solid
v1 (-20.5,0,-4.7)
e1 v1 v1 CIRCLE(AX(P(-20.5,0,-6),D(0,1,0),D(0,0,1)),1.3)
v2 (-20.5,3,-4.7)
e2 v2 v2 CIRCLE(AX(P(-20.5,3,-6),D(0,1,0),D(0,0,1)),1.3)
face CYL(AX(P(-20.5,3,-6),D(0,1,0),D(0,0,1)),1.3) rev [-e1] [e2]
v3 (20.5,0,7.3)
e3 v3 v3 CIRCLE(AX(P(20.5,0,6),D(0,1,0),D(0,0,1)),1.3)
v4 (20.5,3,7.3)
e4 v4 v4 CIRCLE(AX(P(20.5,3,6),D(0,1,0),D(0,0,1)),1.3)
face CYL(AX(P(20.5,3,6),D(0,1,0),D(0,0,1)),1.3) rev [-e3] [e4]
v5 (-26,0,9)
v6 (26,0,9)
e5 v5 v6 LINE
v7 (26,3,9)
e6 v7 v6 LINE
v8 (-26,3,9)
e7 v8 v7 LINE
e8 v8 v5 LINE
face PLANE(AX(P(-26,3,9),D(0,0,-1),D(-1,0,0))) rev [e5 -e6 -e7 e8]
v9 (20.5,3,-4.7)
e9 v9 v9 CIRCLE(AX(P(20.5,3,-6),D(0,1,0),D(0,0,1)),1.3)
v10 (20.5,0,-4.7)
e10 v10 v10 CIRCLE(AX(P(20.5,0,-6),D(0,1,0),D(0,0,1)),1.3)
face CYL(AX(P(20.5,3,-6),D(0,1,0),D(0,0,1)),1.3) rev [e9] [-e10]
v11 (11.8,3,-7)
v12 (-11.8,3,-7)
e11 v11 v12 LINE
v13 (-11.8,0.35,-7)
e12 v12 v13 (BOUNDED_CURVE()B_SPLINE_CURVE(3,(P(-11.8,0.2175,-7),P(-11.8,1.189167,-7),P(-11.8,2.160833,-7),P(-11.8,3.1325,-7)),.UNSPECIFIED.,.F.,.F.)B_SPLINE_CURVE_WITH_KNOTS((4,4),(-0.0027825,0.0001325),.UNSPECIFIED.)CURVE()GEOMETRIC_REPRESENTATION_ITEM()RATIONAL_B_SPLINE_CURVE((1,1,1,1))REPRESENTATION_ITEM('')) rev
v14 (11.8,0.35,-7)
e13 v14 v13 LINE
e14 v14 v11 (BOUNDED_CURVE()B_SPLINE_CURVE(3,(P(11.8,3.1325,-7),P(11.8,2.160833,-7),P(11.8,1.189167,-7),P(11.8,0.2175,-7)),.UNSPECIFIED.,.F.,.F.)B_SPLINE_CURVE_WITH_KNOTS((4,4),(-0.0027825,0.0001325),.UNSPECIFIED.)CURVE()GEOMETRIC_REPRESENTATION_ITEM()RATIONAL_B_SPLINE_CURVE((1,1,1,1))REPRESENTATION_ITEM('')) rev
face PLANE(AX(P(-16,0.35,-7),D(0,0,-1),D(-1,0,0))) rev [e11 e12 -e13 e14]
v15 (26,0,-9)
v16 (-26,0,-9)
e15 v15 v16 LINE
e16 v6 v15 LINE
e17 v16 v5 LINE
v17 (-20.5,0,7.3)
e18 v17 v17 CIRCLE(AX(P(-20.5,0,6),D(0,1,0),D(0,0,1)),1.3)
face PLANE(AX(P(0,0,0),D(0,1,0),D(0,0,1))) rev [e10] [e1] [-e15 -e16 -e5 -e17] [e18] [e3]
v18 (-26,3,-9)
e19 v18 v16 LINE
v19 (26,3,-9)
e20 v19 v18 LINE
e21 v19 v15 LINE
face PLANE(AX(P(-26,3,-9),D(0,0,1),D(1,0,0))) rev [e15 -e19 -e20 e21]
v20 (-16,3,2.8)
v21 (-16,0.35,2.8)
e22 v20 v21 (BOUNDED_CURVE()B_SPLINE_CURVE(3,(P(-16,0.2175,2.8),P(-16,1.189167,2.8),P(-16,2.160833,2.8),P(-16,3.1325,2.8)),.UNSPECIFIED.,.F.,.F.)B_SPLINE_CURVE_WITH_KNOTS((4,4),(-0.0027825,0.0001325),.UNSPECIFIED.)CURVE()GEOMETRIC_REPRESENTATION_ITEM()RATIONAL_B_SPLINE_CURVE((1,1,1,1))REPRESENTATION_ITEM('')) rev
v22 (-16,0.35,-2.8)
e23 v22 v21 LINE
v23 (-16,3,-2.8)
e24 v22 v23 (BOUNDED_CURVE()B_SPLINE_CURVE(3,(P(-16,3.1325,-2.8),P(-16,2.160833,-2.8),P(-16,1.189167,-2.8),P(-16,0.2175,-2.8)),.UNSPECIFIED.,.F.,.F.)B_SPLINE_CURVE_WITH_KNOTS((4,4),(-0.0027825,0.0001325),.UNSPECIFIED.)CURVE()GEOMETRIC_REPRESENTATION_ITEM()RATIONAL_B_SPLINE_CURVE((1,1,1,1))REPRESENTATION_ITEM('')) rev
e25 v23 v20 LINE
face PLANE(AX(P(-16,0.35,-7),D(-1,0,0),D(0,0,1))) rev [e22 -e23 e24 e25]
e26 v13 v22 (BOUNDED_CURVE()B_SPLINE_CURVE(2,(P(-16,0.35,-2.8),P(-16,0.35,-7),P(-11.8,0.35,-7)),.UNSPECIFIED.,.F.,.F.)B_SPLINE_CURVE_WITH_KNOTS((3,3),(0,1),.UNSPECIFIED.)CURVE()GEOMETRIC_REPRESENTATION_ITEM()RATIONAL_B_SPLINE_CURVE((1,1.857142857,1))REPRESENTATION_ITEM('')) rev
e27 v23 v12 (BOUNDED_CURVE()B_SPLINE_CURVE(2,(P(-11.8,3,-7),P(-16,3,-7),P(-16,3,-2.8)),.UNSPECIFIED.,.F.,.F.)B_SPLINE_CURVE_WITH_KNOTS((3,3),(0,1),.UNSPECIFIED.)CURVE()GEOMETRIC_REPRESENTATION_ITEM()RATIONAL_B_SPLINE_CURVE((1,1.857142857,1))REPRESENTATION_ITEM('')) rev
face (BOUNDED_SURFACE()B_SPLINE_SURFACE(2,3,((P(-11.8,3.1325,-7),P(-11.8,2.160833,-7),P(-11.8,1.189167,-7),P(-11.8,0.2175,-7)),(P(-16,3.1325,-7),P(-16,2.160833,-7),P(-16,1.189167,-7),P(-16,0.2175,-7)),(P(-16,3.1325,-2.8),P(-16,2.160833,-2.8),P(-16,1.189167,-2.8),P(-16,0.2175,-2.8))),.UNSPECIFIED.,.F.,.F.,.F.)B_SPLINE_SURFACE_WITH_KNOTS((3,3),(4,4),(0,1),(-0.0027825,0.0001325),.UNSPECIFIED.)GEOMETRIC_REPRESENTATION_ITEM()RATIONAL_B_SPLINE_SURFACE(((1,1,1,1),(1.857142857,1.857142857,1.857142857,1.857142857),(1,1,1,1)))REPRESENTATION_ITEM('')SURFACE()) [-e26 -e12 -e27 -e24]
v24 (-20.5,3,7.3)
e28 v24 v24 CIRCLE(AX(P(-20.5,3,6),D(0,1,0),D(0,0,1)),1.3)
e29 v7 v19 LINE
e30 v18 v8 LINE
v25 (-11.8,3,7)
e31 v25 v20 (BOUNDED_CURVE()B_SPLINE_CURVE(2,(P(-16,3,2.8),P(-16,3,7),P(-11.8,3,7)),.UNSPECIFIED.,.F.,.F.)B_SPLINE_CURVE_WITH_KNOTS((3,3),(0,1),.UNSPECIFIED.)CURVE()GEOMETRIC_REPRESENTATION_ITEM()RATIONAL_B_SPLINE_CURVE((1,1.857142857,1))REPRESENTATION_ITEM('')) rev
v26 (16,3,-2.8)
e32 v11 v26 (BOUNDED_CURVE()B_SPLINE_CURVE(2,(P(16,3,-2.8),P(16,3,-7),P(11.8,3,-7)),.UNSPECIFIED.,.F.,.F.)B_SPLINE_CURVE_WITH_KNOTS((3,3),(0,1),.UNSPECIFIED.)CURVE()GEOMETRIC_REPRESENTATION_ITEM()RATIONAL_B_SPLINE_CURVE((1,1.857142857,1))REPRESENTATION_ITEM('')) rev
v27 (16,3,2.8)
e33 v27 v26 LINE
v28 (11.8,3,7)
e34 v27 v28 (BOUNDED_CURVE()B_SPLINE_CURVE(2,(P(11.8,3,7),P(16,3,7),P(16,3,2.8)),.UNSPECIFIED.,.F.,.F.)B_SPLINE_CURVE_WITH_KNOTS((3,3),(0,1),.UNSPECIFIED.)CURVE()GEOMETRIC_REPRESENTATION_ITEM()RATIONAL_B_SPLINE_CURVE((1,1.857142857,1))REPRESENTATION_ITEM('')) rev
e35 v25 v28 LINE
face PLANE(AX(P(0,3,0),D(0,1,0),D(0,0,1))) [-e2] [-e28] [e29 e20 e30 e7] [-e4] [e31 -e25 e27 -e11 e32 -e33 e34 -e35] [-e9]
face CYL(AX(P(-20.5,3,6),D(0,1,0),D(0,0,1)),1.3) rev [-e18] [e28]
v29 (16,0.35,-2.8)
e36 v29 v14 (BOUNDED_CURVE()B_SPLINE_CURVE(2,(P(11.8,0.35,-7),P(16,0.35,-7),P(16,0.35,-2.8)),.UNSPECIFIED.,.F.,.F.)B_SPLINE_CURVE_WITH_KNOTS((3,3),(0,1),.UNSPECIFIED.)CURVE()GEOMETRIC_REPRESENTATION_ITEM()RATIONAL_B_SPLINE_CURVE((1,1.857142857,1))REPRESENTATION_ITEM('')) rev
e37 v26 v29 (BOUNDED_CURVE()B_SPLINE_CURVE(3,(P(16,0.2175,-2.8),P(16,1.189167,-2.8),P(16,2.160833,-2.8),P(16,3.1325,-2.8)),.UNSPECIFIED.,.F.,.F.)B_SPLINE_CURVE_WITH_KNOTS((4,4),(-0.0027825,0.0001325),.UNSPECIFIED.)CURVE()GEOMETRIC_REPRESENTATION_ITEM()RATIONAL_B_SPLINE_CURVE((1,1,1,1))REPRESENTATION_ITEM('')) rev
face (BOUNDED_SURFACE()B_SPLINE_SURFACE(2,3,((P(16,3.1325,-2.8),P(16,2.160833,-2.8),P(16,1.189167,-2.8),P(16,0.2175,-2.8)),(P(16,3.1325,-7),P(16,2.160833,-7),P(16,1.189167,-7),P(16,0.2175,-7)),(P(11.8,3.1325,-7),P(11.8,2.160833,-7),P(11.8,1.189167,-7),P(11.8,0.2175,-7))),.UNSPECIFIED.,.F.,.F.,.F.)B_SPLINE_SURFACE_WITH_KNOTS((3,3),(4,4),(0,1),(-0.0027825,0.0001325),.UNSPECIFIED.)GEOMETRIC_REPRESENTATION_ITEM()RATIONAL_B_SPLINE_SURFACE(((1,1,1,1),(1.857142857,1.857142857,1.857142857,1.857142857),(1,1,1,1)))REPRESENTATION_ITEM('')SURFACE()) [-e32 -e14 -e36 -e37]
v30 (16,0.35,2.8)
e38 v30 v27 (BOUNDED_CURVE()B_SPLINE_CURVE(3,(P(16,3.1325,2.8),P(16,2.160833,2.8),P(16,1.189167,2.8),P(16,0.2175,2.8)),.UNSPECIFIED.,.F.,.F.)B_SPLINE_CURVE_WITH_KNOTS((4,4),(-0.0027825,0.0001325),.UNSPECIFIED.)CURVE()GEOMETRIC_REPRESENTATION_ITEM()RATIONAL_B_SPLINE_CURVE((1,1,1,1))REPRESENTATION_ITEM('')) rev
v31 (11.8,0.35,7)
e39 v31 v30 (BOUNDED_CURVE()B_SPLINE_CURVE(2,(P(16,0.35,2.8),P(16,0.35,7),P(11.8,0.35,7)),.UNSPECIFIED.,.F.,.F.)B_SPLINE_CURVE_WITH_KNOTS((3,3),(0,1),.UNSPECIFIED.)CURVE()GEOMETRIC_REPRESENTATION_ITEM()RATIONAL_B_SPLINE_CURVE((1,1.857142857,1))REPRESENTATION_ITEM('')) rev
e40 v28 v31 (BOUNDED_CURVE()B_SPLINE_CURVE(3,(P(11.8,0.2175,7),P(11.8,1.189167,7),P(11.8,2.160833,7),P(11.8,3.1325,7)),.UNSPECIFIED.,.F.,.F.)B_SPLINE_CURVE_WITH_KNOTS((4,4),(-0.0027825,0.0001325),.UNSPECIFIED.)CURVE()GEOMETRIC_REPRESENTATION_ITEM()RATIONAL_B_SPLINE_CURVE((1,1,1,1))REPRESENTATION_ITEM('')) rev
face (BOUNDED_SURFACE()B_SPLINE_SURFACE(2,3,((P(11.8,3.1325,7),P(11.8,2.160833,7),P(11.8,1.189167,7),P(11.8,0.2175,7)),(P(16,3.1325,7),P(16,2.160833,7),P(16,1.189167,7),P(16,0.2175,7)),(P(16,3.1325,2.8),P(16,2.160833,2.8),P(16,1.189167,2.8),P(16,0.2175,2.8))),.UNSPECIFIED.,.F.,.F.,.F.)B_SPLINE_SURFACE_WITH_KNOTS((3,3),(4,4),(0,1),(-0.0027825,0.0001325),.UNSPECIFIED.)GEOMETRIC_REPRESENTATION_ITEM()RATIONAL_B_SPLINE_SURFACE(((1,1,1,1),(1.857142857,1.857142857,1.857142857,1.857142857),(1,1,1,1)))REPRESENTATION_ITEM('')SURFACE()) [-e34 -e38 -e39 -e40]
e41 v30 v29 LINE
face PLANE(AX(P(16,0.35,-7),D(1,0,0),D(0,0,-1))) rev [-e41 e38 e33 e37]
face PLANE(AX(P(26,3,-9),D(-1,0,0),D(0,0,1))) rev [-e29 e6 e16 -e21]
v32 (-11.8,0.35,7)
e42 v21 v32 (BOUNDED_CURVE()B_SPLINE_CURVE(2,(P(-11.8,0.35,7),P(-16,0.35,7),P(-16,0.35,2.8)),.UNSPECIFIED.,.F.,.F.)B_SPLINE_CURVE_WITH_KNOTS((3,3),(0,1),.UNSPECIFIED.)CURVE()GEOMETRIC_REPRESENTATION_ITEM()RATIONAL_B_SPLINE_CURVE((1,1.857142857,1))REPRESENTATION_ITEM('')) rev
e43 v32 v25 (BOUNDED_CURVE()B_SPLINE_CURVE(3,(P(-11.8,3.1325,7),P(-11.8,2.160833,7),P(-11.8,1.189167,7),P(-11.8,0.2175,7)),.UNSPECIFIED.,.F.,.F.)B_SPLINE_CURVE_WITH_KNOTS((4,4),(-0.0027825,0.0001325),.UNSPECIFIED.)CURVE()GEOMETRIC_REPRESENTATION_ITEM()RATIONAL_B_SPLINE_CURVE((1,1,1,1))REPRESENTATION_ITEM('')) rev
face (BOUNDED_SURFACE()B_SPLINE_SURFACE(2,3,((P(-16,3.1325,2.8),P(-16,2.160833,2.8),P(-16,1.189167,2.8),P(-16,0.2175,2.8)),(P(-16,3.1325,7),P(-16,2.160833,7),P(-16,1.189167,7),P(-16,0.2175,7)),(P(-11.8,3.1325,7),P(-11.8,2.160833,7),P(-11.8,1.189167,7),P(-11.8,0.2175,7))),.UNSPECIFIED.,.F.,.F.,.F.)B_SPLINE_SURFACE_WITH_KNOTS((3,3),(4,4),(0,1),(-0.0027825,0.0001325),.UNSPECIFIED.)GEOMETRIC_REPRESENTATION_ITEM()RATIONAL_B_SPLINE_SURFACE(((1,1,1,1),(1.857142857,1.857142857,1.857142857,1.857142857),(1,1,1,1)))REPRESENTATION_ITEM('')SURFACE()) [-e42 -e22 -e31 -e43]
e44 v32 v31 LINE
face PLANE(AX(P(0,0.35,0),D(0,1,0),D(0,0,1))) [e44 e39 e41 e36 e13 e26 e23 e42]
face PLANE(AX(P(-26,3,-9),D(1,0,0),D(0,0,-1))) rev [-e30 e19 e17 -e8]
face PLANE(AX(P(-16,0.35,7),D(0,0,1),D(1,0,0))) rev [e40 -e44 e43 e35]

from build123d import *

# Parameters (mm, degrees)
SKETCH1_W                  = 52
SKETCH1_H                  = 18
BOSS_EXTRUDE1_DEPTH        = 3
SKETCH2_W                  = 32
SKETCH2_H                  = 14
CUT_EXTRUDE1_DEPTH         = 2.65
FILLET1_SIZE               = 4.2
F_2_6_2_6_DIAMETER_HOLE1_D = 2.6


with BuildPart() as part:
    # Sketch1 → Boss-Extrude1 (new body)
    with BuildSketch(Plane(origin=(0, 0, 0), x_dir=(1, 0, 0), z_dir=(0, 1, 0))):
        Rectangle(SKETCH1_W, SKETCH1_H)
    extrude(amount=BOSS_EXTRUDE1_DEPTH)

    # Sketch2 → Cut-Extrude1 (cut)
    with BuildSketch(Plane(origin=(0, 3, 0), x_dir=(1, 0, 0), z_dir=(0, 1, 0))):
        Rectangle(SKETCH2_W, SKETCH2_H)
    extrude(amount=-CUT_EXTRUDE1_DEPTH, mode=Mode.SUBTRACT)

    # Fillet1
    # a fillet whose section is not a circle: 4.2 mm, written as the material it adds along each edge
    with BuildSketch(Plane(origin=(16, 3, 7), x_dir=(0, 0, -1), z_dir=(0, -1, 0)), Plane(origin=(-16, 3, 7), x_dir=(1, 0, 0), z_dir=(0, -1, 0)), Plane(origin=(16, 3, -7), x_dir=(-1, 0, 0), z_dir=(0, -1, 0))) as fillet1_piece_1:
        with BuildLine():
            Bezier((FILLET1_SIZE, 0), (0, 0), (0, -FILLET1_SIZE), weights=[1, 1.857142857, 1])
            Line((0, -FILLET1_SIZE), (-FILLET1_SIZE * 0.02, -FILLET1_SIZE))
            Line((-FILLET1_SIZE * 0.02, -FILLET1_SIZE), (-FILLET1_SIZE * 0.02, FILLET1_SIZE * 0.02))
            Line((-FILLET1_SIZE * 0.02, FILLET1_SIZE * 0.02), (FILLET1_SIZE, FILLET1_SIZE * 0.02))
            Line((FILLET1_SIZE, FILLET1_SIZE * 0.02), (FILLET1_SIZE, 0))
        make_face()
    extrude(amount=2.65)
    with BuildSketch(Plane(origin=(-16, 3, -7), x_dir=(1, 0, 0), z_dir=(0, -1, 0))) as fillet1_piece_2:
        with BuildLine():
            Bezier((FILLET1_SIZE, 0), (0, 0), (0, FILLET1_SIZE), weights=[1, 1.857142857, 1])
            Line((0, FILLET1_SIZE), (-FILLET1_SIZE * 0.02, FILLET1_SIZE))
            Line((-FILLET1_SIZE * 0.02, FILLET1_SIZE), (-FILLET1_SIZE * 0.02, -FILLET1_SIZE * 0.02))
            Line((-FILLET1_SIZE * 0.02, -FILLET1_SIZE * 0.02), (FILLET1_SIZE, -FILLET1_SIZE * 0.02))
            Line((FILLET1_SIZE, -FILLET1_SIZE * 0.02), (FILLET1_SIZE, 0))
        make_face()
    extrude(amount=2.65)

    # Ø2.6 (2.6) Diameter Hole1 (through all)
    with Locations(Plane(origin=(0, 3, 0), x_dir=(1, 0, 0), z_dir=(0, 1, 0))):
        with Locations((-20.5, 6), (-20.5, -6), (20.5, 6), (20.5, -6)):
            Hole(F_2_6_2_6_DIAMETER_HOLE1_D / 2)


solid = part.part
